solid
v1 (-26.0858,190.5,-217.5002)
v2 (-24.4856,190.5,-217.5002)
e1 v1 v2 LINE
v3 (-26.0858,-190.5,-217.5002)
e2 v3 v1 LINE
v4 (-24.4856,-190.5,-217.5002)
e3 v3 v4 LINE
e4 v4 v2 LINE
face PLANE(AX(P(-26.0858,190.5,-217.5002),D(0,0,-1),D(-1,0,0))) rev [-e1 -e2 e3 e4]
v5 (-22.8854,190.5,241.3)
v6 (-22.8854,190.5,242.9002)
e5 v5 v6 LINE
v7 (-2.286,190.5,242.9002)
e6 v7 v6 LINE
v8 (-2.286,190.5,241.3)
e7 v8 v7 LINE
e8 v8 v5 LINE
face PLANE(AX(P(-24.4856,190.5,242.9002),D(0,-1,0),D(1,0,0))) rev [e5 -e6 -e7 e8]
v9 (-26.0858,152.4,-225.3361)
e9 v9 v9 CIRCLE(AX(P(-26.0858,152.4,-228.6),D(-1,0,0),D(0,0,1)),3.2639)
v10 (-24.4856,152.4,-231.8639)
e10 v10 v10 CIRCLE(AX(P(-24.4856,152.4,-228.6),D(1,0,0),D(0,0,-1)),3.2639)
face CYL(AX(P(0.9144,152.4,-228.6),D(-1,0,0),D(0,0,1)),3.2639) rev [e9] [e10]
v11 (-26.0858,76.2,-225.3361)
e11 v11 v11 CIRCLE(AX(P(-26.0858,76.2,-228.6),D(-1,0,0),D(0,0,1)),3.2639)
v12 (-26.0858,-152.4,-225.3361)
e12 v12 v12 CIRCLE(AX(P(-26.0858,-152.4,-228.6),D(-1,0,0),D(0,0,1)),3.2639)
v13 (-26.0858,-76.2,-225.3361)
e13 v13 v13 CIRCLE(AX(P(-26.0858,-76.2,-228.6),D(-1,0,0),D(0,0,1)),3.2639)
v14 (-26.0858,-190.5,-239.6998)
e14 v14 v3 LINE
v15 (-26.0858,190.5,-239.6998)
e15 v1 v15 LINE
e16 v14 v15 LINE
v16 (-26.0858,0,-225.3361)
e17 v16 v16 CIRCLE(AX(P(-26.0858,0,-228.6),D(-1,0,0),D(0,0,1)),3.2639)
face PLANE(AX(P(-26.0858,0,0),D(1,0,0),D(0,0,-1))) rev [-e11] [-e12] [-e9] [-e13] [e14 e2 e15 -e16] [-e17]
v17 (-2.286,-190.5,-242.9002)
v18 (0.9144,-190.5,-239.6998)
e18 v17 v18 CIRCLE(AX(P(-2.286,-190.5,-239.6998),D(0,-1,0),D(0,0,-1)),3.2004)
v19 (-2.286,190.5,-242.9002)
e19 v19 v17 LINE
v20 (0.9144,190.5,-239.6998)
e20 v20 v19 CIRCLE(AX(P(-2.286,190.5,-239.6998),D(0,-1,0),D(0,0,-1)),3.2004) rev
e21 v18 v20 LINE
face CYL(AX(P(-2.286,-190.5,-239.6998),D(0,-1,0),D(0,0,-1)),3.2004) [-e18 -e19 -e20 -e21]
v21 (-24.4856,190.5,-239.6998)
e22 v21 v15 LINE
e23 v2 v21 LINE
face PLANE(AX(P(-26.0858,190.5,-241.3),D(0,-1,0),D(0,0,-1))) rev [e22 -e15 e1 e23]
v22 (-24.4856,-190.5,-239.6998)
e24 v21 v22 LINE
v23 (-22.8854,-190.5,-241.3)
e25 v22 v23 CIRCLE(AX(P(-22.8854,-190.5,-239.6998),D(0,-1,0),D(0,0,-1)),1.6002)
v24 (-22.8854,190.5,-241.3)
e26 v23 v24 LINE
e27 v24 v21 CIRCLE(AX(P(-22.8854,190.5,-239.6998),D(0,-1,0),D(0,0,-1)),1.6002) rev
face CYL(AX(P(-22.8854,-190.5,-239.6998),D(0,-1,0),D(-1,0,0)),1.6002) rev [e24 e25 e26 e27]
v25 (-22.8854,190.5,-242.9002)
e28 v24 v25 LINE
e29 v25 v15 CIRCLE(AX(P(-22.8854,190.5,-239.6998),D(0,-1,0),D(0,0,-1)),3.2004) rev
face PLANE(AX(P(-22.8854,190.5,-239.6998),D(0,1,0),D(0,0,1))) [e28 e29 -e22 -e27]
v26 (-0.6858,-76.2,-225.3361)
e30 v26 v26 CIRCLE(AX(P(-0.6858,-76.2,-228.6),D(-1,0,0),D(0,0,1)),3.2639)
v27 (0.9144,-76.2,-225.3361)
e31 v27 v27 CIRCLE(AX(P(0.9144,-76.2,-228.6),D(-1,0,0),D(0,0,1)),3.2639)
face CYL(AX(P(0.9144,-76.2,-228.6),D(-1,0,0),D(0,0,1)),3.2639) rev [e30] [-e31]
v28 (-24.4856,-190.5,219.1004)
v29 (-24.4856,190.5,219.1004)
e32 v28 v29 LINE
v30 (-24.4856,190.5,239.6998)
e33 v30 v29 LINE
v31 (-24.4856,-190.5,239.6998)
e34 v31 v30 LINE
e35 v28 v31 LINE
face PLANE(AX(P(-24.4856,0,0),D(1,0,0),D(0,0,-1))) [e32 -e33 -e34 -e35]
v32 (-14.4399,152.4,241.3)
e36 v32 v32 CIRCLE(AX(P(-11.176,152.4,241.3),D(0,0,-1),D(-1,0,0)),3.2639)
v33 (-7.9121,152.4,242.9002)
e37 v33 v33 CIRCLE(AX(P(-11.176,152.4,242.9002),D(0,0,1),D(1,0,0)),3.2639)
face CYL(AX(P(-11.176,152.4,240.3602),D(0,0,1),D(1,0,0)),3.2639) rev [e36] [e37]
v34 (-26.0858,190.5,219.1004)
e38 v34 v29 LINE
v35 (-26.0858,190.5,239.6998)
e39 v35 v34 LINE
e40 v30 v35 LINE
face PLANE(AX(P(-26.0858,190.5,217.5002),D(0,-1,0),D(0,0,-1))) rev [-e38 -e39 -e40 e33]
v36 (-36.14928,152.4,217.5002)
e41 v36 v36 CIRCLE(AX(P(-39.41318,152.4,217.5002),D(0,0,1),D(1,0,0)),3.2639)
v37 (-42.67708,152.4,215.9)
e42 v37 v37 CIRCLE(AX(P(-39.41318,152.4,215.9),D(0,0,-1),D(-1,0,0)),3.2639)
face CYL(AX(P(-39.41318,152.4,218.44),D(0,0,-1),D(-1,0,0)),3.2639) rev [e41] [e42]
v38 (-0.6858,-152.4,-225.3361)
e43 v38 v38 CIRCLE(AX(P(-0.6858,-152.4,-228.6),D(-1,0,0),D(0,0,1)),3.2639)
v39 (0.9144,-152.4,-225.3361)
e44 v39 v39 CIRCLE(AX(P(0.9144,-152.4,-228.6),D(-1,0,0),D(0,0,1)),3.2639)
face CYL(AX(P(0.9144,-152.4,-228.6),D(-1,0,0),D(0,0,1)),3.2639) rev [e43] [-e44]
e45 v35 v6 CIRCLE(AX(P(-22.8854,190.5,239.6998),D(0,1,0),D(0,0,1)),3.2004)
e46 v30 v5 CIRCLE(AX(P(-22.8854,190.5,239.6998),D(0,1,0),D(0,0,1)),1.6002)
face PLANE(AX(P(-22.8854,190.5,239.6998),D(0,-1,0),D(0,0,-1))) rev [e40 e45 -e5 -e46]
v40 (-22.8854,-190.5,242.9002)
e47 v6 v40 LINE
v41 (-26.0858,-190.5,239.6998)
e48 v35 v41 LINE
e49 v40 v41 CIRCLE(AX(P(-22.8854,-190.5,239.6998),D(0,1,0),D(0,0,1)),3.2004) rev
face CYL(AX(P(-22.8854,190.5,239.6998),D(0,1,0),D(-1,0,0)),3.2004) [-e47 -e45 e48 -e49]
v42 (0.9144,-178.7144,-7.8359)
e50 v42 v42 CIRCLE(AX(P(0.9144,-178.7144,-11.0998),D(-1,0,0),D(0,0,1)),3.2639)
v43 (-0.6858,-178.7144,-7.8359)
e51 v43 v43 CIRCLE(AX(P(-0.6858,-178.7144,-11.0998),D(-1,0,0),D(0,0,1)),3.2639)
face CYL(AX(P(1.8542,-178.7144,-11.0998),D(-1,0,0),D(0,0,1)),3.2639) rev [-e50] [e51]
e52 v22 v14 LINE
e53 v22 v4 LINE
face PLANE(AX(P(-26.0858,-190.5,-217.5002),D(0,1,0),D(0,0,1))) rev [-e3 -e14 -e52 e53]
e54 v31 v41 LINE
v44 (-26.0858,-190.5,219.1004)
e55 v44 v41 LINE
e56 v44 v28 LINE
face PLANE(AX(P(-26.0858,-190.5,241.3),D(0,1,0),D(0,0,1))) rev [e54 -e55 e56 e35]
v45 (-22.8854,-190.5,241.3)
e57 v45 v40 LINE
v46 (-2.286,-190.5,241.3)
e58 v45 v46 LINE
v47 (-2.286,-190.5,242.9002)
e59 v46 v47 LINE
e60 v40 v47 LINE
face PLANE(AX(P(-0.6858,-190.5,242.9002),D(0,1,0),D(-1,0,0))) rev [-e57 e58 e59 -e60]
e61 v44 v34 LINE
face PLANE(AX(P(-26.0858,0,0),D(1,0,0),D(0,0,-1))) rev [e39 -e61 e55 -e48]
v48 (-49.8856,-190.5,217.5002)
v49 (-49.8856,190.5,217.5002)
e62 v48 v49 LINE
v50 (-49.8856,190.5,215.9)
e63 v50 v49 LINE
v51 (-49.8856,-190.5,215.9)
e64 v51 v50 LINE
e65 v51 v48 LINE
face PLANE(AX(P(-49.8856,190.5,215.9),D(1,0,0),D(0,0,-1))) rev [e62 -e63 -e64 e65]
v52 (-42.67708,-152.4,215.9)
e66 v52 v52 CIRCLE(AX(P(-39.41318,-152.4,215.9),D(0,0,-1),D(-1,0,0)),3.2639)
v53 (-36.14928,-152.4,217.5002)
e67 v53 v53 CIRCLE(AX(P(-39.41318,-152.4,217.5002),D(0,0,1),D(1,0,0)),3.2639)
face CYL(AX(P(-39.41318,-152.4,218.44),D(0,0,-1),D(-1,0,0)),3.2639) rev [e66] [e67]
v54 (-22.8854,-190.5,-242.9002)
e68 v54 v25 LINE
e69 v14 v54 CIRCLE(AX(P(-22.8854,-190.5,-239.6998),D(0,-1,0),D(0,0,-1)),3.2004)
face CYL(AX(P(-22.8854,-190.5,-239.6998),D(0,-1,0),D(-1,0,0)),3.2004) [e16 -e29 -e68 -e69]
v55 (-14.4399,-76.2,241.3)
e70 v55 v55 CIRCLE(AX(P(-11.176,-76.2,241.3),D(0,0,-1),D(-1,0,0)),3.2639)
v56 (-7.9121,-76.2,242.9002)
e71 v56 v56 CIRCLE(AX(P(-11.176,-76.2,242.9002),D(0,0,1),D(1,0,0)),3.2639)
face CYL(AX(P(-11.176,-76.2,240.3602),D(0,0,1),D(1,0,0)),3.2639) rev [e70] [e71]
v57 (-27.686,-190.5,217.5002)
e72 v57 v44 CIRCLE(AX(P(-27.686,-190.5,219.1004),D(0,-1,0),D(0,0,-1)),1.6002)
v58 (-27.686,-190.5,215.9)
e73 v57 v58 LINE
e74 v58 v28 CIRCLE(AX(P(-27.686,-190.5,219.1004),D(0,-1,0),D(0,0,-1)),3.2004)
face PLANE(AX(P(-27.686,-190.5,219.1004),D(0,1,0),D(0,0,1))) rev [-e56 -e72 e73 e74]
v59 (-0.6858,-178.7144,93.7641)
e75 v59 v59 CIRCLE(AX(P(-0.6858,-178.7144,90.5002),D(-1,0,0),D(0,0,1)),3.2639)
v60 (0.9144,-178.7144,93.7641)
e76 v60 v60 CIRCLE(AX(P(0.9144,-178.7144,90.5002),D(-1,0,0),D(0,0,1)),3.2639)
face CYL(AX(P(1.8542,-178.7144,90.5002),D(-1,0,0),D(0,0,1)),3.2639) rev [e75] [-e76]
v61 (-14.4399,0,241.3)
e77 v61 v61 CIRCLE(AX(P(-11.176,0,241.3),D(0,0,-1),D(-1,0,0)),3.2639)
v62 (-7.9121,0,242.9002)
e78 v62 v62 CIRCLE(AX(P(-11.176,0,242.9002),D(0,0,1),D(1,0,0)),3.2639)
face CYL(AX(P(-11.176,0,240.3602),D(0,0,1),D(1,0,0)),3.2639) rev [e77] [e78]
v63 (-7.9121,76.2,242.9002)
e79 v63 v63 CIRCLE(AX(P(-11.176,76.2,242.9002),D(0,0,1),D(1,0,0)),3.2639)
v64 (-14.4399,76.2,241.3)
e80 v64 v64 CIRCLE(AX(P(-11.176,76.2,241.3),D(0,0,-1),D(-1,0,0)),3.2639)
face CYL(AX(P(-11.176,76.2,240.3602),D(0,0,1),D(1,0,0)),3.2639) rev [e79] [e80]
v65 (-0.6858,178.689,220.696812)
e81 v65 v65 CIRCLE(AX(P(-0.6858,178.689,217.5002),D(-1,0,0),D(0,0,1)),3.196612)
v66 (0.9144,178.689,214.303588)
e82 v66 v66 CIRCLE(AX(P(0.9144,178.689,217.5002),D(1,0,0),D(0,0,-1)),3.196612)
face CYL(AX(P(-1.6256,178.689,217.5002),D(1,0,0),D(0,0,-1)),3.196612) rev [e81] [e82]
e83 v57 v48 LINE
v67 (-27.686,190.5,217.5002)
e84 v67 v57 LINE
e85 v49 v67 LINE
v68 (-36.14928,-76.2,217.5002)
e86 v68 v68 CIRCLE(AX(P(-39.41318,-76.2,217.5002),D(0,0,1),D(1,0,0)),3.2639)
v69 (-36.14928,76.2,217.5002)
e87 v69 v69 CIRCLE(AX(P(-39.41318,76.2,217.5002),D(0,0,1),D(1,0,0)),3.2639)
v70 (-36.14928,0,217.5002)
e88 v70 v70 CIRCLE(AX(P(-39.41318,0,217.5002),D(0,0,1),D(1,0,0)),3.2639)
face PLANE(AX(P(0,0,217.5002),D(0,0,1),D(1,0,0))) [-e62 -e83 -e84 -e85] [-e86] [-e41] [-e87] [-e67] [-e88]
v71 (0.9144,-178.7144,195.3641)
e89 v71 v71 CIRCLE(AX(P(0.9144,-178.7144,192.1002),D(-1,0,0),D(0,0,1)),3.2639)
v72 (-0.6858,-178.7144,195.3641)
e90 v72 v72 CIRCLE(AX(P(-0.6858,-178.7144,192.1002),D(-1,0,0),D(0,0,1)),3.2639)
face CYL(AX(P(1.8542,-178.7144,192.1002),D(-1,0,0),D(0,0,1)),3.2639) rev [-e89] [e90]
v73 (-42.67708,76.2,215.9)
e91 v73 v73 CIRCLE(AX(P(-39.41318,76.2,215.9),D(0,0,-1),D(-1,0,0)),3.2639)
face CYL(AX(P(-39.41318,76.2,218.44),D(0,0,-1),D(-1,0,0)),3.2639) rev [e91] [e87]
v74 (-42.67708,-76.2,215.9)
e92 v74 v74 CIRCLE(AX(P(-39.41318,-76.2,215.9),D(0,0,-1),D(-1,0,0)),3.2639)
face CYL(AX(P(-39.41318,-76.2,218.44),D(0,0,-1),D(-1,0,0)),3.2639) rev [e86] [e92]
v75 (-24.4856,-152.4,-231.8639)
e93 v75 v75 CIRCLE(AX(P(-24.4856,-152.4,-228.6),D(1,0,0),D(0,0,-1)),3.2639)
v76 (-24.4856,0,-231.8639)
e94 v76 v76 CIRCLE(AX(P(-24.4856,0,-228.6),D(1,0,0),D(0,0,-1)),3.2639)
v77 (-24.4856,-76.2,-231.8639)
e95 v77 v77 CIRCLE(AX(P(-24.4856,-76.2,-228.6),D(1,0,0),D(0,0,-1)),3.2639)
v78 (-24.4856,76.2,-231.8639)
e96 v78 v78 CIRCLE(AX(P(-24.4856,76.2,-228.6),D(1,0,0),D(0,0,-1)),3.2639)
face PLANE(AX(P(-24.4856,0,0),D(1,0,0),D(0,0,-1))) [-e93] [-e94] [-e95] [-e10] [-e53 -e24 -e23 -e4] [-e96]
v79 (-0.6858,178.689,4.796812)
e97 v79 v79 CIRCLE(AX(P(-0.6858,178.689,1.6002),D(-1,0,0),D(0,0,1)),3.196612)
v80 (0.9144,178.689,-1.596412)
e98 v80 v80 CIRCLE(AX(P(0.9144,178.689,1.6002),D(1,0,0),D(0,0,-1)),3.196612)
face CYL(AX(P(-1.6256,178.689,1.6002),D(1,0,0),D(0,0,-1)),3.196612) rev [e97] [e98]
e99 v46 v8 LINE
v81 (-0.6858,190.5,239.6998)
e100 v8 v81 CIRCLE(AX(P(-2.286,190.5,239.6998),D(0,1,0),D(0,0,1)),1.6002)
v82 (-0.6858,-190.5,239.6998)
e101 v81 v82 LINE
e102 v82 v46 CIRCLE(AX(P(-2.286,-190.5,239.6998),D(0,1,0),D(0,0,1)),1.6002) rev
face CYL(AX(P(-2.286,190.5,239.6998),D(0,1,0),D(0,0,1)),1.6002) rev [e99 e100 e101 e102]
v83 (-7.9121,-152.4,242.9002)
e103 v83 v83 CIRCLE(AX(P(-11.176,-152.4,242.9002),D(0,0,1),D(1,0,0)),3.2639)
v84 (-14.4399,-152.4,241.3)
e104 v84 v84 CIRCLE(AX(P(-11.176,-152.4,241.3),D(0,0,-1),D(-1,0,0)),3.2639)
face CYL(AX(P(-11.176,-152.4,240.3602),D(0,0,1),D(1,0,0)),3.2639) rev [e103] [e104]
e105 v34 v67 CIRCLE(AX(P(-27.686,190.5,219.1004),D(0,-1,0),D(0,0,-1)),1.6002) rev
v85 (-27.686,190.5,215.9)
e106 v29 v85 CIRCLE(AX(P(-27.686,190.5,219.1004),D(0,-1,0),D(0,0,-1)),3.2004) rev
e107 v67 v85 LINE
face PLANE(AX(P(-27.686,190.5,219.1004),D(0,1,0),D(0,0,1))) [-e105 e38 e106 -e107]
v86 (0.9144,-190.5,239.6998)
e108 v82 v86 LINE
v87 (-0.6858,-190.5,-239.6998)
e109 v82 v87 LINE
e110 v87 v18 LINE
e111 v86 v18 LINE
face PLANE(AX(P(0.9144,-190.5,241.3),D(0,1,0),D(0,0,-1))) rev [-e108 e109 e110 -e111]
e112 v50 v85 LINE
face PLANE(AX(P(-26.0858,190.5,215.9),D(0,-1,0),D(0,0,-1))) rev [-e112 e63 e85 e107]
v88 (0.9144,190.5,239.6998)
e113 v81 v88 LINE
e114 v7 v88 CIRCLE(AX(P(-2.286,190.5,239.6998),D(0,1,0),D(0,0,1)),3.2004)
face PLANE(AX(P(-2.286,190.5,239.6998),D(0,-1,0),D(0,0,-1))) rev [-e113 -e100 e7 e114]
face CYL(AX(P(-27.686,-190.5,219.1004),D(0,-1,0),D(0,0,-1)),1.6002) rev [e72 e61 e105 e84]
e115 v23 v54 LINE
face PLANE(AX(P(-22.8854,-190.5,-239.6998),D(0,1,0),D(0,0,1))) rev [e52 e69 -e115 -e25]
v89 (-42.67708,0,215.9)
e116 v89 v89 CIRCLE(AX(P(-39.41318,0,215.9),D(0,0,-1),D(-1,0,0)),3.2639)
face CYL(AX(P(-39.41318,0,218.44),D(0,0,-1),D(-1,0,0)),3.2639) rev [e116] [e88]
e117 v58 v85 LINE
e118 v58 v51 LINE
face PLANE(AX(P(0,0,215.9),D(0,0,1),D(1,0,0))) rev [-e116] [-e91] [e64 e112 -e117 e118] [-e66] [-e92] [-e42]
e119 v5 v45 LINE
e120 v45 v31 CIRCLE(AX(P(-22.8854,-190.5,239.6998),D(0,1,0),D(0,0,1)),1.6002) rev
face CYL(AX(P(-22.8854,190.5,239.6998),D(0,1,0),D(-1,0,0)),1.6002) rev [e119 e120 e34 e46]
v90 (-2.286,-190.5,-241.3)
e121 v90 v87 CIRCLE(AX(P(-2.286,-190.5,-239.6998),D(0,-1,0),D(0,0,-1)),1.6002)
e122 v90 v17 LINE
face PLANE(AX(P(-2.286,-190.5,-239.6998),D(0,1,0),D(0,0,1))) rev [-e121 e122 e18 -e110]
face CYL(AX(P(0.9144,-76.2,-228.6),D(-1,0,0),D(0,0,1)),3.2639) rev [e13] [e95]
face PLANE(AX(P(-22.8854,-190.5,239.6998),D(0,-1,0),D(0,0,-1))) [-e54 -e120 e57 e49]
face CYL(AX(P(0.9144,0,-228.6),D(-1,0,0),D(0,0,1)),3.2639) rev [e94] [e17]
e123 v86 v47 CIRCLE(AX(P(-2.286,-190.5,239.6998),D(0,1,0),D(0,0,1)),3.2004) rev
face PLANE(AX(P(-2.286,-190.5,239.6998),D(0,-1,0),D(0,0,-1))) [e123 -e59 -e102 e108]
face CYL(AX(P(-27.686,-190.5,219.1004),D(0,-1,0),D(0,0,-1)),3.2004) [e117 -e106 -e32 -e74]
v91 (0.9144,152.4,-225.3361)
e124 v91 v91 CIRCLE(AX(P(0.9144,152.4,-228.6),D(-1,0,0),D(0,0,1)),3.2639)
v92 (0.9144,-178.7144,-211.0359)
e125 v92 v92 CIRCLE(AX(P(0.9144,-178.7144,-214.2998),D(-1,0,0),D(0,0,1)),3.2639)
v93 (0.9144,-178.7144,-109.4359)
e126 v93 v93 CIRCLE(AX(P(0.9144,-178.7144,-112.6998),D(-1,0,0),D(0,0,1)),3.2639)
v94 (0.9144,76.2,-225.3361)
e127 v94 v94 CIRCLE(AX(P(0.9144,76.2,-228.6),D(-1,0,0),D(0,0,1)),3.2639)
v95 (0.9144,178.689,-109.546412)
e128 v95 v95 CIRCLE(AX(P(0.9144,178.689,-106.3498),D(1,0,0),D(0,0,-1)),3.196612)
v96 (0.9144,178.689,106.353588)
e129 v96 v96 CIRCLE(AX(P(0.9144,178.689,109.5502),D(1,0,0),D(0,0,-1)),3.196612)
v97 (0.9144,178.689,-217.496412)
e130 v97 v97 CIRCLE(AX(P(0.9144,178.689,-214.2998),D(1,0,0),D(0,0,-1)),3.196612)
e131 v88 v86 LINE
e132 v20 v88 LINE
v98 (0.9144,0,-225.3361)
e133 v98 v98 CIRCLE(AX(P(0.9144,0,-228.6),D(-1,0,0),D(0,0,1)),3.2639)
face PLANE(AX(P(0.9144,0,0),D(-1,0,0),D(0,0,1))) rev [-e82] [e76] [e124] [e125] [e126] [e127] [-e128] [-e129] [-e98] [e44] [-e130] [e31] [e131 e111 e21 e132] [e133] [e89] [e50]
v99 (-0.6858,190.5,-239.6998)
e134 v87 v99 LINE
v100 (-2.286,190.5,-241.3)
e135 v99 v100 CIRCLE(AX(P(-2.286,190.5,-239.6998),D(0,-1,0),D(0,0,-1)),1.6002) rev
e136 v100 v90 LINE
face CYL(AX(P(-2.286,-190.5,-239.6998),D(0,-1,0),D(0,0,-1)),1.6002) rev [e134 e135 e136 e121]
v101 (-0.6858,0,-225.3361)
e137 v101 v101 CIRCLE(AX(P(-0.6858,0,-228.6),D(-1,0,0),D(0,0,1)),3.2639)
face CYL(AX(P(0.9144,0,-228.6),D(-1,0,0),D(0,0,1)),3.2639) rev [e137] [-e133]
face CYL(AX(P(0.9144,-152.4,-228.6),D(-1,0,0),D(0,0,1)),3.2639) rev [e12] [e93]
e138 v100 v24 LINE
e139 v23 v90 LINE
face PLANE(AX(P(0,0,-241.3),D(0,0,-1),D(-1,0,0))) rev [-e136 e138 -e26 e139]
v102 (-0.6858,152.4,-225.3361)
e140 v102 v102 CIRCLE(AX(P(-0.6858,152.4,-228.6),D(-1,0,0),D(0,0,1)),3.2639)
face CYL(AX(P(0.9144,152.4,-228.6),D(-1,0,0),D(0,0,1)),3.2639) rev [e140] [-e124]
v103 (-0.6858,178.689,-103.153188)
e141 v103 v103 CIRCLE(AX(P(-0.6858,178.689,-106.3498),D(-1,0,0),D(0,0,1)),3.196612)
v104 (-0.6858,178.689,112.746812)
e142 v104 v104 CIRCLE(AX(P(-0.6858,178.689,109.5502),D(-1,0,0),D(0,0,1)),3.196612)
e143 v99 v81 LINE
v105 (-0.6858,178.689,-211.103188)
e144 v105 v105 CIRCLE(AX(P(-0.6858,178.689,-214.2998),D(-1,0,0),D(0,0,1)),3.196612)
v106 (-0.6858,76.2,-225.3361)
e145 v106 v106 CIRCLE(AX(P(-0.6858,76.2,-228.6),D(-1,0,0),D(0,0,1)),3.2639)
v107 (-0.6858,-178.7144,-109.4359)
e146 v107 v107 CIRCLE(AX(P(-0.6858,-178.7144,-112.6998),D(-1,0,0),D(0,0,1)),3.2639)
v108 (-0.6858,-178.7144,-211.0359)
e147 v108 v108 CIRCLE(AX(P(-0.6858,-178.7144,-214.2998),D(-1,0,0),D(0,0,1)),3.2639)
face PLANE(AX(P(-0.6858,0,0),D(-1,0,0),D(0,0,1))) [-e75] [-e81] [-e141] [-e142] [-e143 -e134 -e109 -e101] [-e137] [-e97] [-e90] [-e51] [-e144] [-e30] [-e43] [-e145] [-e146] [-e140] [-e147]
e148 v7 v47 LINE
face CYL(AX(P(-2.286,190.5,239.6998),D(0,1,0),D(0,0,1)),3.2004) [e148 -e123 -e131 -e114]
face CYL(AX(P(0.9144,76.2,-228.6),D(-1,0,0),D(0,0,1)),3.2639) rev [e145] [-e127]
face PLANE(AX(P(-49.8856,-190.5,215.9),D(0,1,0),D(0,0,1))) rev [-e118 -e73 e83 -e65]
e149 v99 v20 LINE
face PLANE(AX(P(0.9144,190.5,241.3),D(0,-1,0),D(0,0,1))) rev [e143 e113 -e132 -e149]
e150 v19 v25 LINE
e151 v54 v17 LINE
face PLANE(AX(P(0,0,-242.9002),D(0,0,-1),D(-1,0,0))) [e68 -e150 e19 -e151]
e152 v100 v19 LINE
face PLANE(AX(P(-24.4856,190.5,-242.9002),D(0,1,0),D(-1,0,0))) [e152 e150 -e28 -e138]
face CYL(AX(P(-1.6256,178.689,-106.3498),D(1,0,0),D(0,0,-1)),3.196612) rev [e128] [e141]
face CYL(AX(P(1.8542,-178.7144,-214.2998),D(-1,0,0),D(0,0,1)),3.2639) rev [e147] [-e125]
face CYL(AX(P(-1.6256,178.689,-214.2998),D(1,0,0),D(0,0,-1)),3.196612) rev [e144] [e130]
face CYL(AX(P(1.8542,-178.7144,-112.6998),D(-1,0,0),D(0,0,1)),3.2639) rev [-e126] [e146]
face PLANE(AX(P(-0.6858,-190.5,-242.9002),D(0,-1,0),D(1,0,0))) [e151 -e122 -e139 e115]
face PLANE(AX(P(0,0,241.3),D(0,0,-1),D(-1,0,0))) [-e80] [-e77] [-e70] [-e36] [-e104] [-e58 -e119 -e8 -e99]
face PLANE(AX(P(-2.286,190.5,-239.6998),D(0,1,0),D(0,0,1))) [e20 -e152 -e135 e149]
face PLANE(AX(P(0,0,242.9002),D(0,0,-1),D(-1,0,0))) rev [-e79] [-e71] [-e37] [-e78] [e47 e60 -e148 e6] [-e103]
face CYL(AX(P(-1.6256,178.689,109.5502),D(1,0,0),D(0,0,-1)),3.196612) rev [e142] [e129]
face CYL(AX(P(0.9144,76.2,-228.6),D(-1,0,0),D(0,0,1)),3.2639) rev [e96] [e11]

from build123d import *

# Parameters (mm, degrees)
SKETCH1_W                    = 482.6
SKETCH1_H                    = 381
BOSS_EXTRUDE1_DEPTH          = 0.9144
CONVERT_SOLID1_START         = -241.3
CONVERT_SOLID1_OUTLINE_W     = 0.6858
CONVERT_SOLID1_OUTLINE_H     = 381
CONVERT_SOLID1_DEPTH         = 482.6
EDGE_FLANGE1_STRIP_W         = 9.6012
EDGE_FLANGE1_STRIP_H         = 1.6002
EDGE_FLANGE1_STRIP_CUT_DEPTH = 381
EDGE_FLANGE1_DEPTH           = 381
EDGE_FLANGE2_STRIP_W         = 9.6012
EDGE_FLANGE2_STRIP_H         = 1.6002
EDGE_FLANGE2_STRIP_CUT_DEPTH = 381
EDGE_FLANGE2_DEPTH           = 381
EDGE_FLANGE3_STRIP_W         = 9.6012
EDGE_FLANGE3_STRIP_H         = 1.6002
EDGE_FLANGE3_STRIP_CUT_DEPTH = 381
EDGE_FLANGE3_DEPTH           = 381
EDGE_FLANGE4_STRIP_W         = 9.6012
EDGE_FLANGE4_STRIP_H         = 1.6002
EDGE_FLANGE4_STRIP_CUT_DEPTH = 381
EDGE_FLANGE4_DEPTH           = 381
EDGE_FLANGE5_STRIP_W         = 9.6012
EDGE_FLANGE5_STRIP_H         = 1.6002
EDGE_FLANGE5_STRIP_CUT_DEPTH = 381
EDGE_FLANGE5_DEPTH           = 381
SKETCH26_R                   = 3.2639
CUT_EXTRUDE2_DEPTH           = 2.54
SKETCH29_R                   = 3.2639
CUT_EXTRUDE4_DEPTH           = 310.870566463
SKETCH30_R                   = 3.2639
CUT_EXTRUDE5_DEPTH           = 2.54
SKETCH31_R                   = 3.19661248
CUT_EXTRUDE6_DEPTH           = 2.54
SKETCH32_R                   = 3.2639
CUT_EXTRUDE7_DEPTH           = 2.54


# Read off the part's stored shape, not the designer's step: Convert-Solid1
# Sheet-metal steps are written as plain solids
with BuildPart() as part:
    # Sketch1 → Boss-Extrude1 (new body)
    with BuildSketch(Plane(origin=(0, 0, 0), x_dir=(0, 0, -1), z_dir=(1, 0, 0))):
        Rectangle(SKETCH1_W, SKETCH1_H)
    extrude(amount=BOSS_EXTRUDE1_DEPTH)

    # Convert-Solid1 outline → Convert-Solid1 (add)
    with BuildSketch(Plane.XY.offset(CONVERT_SOLID1_START)):
        with Locations((-0.3429, 0)):
            Rectangle(CONVERT_SOLID1_OUTLINE_W, CONVERT_SOLID1_OUTLINE_H)
    extrude(amount=CONVERT_SOLID1_DEPTH)

    # Edge-Flange1 strip (across the edge) → Edge-Flange1 strip cut (cut)
    with BuildSketch(Plane(origin=(-0.6858, 190.5, -241.3), x_dir=(0, 0, 1), z_dir=(0, -1, 0))):
        with Locations((-3.2004, -0.8001)):
            Rectangle(EDGE_FLANGE1_STRIP_W, EDGE_FLANGE1_STRIP_H)
    extrude(amount=EDGE_FLANGE1_STRIP_CUT_DEPTH, mode=Mode.SUBTRACT)

    # Edge-Flange1 section (across the edge) → Edge-Flange1 (add)
    with BuildSketch(Plane(origin=(-0.6858, 190.5, -241.3), x_dir=(0, 0, 1), z_dir=(0, -1, 0))):
        with BuildLine():
            Line((-1.6002, 1.6002), (-1.6002, 23.7998))
            Line((-1.6002, 23.7998), (0, 23.7998))
            Line((0, 23.7998), (0, 1.6002))
            ThreePointArc((0, 1.6002), (0.468687729, 0.468687729), (1.6002, 0))
            Line((1.6002, 0), (1.6002, -1.6002))
            ThreePointArc((1.6002, -1.6002), (-0.662824543, -0.662824543), (-1.6002, 1.6002))
        make_face()
    extrude(amount=EDGE_FLANGE1_DEPTH)

    # Edge-Flange2 strip (across the edge) → Edge-Flange2 strip cut (cut)
    with BuildSketch(Plane(origin=(-24.4856, 190.5, -241.3), x_dir=(1, 0, 0), z_dir=(0, -1, 0))):
        with Locations((-3.2004, -0.8001)):
            Rectangle(EDGE_FLANGE2_STRIP_W, EDGE_FLANGE2_STRIP_H)
    extrude(amount=EDGE_FLANGE2_STRIP_CUT_DEPTH, mode=Mode.SUBTRACT)

    # Edge-Flange2 section (across the edge) → Edge-Flange2 (add)
    with BuildSketch(Plane(origin=(-24.4856, 190.5, -241.3), x_dir=(1, 0, 0), z_dir=(0, -1, 0))):
        with BuildLine():
            Line((-1.6002, 1.6002), (-1.6002, 23.7998))
            Line((-1.6002, 23.7998), (0, 23.7998))
            Line((0, 23.7998), (0, 1.6002))
            ThreePointArc((0, 1.6002), (0.468687729, 0.468687729), (1.6002, 0))
            Line((1.6002, 0), (1.6002, -1.6002))
            ThreePointArc((1.6002, -1.6002), (-0.662824543, -0.662824543), (-1.6002, 1.6002))
        make_face()
    extrude(amount=EDGE_FLANGE2_DEPTH)

    # Edge-Flange3 strip (across the edge) → Edge-Flange3 strip cut (cut)
    with BuildSketch(Plane(origin=(-0.6858, -190.5, 241.3), x_dir=(0, 0, -1), z_dir=(0, 1, 0))):
        with Locations((-3.2004, -0.8001)):
            Rectangle(EDGE_FLANGE3_STRIP_W, EDGE_FLANGE3_STRIP_H)
    extrude(amount=EDGE_FLANGE3_STRIP_CUT_DEPTH, mode=Mode.SUBTRACT)

    # Edge-Flange3 section (across the edge) → Edge-Flange3 (add)
    with BuildSketch(Plane(origin=(-0.6858, -190.5, 241.3), x_dir=(0, 0, -1), z_dir=(0, 1, 0))):
        with BuildLine():
            Line((-1.6002, 1.6002), (-1.6002, 23.7998))
            Line((-1.6002, 23.7998), (0, 23.7998))
            Line((0, 23.7998), (0, 1.6002))
            ThreePointArc((0, 1.6002), (0.468687729, 0.468687729), (1.6002, 0))
            Line((1.6002, 0), (1.6002, -1.6002))
            ThreePointArc((1.6002, -1.6002), (-0.662824543, -0.662824543), (-1.6002, 1.6002))
        make_face()
    extrude(amount=EDGE_FLANGE3_DEPTH)

    # Edge-Flange4 strip (across the edge) → Edge-Flange4 strip cut (cut)
    with BuildSketch(Plane(origin=(-24.4856, -190.5, 241.3), x_dir=(1, 0, 0), z_dir=(0, 1, 0))):
        with Locations((-3.2004, -0.8001)):
            Rectangle(EDGE_FLANGE4_STRIP_W, EDGE_FLANGE4_STRIP_H)
    extrude(amount=EDGE_FLANGE4_STRIP_CUT_DEPTH, mode=Mode.SUBTRACT)

    # Edge-Flange4 section (across the edge) → Edge-Flange4 (add)
    with BuildSketch(Plane(origin=(-24.4856, -190.5, 241.3), x_dir=(1, 0, 0), z_dir=(0, 1, 0))):
        with BuildLine():
            Line((-1.6002, 1.6002), (-1.6002, 23.7998))
            Line((-1.6002, 23.7998), (0, 23.7998))
            Line((0, 23.7998), (0, 1.6002))
            ThreePointArc((0, 1.6002), (0.468687729, 0.468687729), (1.6002, 0))
            Line((1.6002, 0), (1.6002, -1.6002))
            ThreePointArc((1.6002, -1.6002), (-0.662824543, -0.662824543), (-1.6002, 1.6002))
        make_face()
    extrude(amount=EDGE_FLANGE4_DEPTH)

    # Edge-Flange5 strip (across the edge) → Edge-Flange5 strip cut (cut)
    with BuildSketch(Plane(origin=(-26.0858, 190.5, 217.5002), x_dir=(0, 0, 1), z_dir=(0, -1, 0))):
        with Locations((-3.2004, -0.8001)):
            Rectangle(EDGE_FLANGE5_STRIP_W, EDGE_FLANGE5_STRIP_H)
    extrude(amount=EDGE_FLANGE5_STRIP_CUT_DEPTH, mode=Mode.SUBTRACT)

    # Edge-Flange5 section (across the edge) → Edge-Flange5 (add)
    with BuildSketch(Plane(origin=(-26.0858, 190.5, 217.5002), x_dir=(0, 0, 1), z_dir=(0, -1, 0))):
        with BuildLine():
            Line((-1.6002, 1.6002), (-1.6002, 23.7998))
            Line((-1.6002, 23.7998), (0, 23.7998))
            Line((0, 23.7998), (0, 1.6002))
            ThreePointArc((0, 1.6002), (0.468687729, 0.468687729), (1.6002, 0))
            Line((1.6002, 0), (1.6002, -1.6002))
            ThreePointArc((1.6002, -1.6002), (-0.662824543, -0.662824543), (-1.6002, 1.6002))
        make_face()
    extrude(amount=EDGE_FLANGE5_DEPTH)

    # Sketch26 → Cut-Extrude2 (cut)
    with BuildSketch(Plane(origin=(0, 0, 215.9), x_dir=(-1, 0, 0), z_dir=(0, 0, -1))):
        with Locations((39.41318, 152.4)):
            Circle(SKETCH26_R)
        with Locations((39.41318, 76.2)):
            Circle(SKETCH26_R)
        with Locations((39.41318, 0)):
            Circle(SKETCH26_R)
        with Locations((39.41318, -76.2)):
            Circle(SKETCH26_R)
        with Locations((39.41318, -152.4)):
            Circle(SKETCH26_R)
    extrude(amount=-CUT_EXTRUDE2_DEPTH, mode=Mode.SUBTRACT)

    # Sketch29 → Cut-Extrude4 (cut, through all)
    with BuildSketch(Plane.ZY.offset(26.0858)):
        with Locations((-228.6, 152.4)):
            Circle(SKETCH29_R)
        with Locations((-228.6, 76.2)):
            Circle(SKETCH29_R)
        with Locations((-228.6, 0)):
            Circle(SKETCH29_R)
        with Locations((-228.6, -76.2)):
            Circle(SKETCH29_R)
        with Locations((-228.6, -152.4)):
            Circle(SKETCH29_R)
    extrude(amount=-CUT_EXTRUDE4_DEPTH, mode=Mode.SUBTRACT)

    # Sketch30 → Cut-Extrude5 (cut)
    with BuildSketch(Plane.XY.offset(242.9002)):
        with Locations((-11.176, 152.4)):
            Circle(SKETCH30_R)
        with Locations((-11.176, 76.2)):
            Circle(SKETCH30_R)
        with Locations((-11.176, 0)):
            Circle(SKETCH30_R)
        with Locations((-11.176, -76.2)):
            Circle(SKETCH30_R)
        with Locations((-11.176, -152.4)):
            Circle(SKETCH30_R)
    extrude(amount=-CUT_EXTRUDE5_DEPTH, mode=Mode.SUBTRACT)

    # Sketch31 → Cut-Extrude6 (cut)
    with BuildSketch(Plane(origin=(0.9144, 0, 0), x_dir=(0, 0, -1), z_dir=(1, 0, 0))):
        with Locations((-217.5002, 178.689)):
            Circle(SKETCH31_R)
        with Locations((-109.5502, 178.689)):
            Circle(SKETCH31_R)
        with Locations((-1.6002, 178.689)):
            Circle(SKETCH31_R)
        with Locations((106.3498, 178.689)):
            Circle(SKETCH31_R)
        with Locations((214.2998, 178.689)):
            Circle(SKETCH31_R)
    extrude(amount=-CUT_EXTRUDE6_DEPTH, mode=Mode.SUBTRACT)

    # Sketch32 → Cut-Extrude7 (cut)
    with BuildSketch(Plane.ZY.offset(0.6858)):
        with Locations((-214.2998, -178.7144)):
            Circle(SKETCH32_R)
        with Locations((-112.6998, -178.7144)):
            Circle(SKETCH32_R)
        with Locations((-11.0998, -178.7144)):
            Circle(SKETCH32_R)
        with Locations((90.5002, -178.7144)):
            Circle(SKETCH32_R)
        with Locations((192.1002, -178.7144)):
            Circle(SKETCH32_R)
    extrude(amount=-CUT_EXTRUDE7_DEPTH, mode=Mode.SUBTRACT)


solid = part.part
